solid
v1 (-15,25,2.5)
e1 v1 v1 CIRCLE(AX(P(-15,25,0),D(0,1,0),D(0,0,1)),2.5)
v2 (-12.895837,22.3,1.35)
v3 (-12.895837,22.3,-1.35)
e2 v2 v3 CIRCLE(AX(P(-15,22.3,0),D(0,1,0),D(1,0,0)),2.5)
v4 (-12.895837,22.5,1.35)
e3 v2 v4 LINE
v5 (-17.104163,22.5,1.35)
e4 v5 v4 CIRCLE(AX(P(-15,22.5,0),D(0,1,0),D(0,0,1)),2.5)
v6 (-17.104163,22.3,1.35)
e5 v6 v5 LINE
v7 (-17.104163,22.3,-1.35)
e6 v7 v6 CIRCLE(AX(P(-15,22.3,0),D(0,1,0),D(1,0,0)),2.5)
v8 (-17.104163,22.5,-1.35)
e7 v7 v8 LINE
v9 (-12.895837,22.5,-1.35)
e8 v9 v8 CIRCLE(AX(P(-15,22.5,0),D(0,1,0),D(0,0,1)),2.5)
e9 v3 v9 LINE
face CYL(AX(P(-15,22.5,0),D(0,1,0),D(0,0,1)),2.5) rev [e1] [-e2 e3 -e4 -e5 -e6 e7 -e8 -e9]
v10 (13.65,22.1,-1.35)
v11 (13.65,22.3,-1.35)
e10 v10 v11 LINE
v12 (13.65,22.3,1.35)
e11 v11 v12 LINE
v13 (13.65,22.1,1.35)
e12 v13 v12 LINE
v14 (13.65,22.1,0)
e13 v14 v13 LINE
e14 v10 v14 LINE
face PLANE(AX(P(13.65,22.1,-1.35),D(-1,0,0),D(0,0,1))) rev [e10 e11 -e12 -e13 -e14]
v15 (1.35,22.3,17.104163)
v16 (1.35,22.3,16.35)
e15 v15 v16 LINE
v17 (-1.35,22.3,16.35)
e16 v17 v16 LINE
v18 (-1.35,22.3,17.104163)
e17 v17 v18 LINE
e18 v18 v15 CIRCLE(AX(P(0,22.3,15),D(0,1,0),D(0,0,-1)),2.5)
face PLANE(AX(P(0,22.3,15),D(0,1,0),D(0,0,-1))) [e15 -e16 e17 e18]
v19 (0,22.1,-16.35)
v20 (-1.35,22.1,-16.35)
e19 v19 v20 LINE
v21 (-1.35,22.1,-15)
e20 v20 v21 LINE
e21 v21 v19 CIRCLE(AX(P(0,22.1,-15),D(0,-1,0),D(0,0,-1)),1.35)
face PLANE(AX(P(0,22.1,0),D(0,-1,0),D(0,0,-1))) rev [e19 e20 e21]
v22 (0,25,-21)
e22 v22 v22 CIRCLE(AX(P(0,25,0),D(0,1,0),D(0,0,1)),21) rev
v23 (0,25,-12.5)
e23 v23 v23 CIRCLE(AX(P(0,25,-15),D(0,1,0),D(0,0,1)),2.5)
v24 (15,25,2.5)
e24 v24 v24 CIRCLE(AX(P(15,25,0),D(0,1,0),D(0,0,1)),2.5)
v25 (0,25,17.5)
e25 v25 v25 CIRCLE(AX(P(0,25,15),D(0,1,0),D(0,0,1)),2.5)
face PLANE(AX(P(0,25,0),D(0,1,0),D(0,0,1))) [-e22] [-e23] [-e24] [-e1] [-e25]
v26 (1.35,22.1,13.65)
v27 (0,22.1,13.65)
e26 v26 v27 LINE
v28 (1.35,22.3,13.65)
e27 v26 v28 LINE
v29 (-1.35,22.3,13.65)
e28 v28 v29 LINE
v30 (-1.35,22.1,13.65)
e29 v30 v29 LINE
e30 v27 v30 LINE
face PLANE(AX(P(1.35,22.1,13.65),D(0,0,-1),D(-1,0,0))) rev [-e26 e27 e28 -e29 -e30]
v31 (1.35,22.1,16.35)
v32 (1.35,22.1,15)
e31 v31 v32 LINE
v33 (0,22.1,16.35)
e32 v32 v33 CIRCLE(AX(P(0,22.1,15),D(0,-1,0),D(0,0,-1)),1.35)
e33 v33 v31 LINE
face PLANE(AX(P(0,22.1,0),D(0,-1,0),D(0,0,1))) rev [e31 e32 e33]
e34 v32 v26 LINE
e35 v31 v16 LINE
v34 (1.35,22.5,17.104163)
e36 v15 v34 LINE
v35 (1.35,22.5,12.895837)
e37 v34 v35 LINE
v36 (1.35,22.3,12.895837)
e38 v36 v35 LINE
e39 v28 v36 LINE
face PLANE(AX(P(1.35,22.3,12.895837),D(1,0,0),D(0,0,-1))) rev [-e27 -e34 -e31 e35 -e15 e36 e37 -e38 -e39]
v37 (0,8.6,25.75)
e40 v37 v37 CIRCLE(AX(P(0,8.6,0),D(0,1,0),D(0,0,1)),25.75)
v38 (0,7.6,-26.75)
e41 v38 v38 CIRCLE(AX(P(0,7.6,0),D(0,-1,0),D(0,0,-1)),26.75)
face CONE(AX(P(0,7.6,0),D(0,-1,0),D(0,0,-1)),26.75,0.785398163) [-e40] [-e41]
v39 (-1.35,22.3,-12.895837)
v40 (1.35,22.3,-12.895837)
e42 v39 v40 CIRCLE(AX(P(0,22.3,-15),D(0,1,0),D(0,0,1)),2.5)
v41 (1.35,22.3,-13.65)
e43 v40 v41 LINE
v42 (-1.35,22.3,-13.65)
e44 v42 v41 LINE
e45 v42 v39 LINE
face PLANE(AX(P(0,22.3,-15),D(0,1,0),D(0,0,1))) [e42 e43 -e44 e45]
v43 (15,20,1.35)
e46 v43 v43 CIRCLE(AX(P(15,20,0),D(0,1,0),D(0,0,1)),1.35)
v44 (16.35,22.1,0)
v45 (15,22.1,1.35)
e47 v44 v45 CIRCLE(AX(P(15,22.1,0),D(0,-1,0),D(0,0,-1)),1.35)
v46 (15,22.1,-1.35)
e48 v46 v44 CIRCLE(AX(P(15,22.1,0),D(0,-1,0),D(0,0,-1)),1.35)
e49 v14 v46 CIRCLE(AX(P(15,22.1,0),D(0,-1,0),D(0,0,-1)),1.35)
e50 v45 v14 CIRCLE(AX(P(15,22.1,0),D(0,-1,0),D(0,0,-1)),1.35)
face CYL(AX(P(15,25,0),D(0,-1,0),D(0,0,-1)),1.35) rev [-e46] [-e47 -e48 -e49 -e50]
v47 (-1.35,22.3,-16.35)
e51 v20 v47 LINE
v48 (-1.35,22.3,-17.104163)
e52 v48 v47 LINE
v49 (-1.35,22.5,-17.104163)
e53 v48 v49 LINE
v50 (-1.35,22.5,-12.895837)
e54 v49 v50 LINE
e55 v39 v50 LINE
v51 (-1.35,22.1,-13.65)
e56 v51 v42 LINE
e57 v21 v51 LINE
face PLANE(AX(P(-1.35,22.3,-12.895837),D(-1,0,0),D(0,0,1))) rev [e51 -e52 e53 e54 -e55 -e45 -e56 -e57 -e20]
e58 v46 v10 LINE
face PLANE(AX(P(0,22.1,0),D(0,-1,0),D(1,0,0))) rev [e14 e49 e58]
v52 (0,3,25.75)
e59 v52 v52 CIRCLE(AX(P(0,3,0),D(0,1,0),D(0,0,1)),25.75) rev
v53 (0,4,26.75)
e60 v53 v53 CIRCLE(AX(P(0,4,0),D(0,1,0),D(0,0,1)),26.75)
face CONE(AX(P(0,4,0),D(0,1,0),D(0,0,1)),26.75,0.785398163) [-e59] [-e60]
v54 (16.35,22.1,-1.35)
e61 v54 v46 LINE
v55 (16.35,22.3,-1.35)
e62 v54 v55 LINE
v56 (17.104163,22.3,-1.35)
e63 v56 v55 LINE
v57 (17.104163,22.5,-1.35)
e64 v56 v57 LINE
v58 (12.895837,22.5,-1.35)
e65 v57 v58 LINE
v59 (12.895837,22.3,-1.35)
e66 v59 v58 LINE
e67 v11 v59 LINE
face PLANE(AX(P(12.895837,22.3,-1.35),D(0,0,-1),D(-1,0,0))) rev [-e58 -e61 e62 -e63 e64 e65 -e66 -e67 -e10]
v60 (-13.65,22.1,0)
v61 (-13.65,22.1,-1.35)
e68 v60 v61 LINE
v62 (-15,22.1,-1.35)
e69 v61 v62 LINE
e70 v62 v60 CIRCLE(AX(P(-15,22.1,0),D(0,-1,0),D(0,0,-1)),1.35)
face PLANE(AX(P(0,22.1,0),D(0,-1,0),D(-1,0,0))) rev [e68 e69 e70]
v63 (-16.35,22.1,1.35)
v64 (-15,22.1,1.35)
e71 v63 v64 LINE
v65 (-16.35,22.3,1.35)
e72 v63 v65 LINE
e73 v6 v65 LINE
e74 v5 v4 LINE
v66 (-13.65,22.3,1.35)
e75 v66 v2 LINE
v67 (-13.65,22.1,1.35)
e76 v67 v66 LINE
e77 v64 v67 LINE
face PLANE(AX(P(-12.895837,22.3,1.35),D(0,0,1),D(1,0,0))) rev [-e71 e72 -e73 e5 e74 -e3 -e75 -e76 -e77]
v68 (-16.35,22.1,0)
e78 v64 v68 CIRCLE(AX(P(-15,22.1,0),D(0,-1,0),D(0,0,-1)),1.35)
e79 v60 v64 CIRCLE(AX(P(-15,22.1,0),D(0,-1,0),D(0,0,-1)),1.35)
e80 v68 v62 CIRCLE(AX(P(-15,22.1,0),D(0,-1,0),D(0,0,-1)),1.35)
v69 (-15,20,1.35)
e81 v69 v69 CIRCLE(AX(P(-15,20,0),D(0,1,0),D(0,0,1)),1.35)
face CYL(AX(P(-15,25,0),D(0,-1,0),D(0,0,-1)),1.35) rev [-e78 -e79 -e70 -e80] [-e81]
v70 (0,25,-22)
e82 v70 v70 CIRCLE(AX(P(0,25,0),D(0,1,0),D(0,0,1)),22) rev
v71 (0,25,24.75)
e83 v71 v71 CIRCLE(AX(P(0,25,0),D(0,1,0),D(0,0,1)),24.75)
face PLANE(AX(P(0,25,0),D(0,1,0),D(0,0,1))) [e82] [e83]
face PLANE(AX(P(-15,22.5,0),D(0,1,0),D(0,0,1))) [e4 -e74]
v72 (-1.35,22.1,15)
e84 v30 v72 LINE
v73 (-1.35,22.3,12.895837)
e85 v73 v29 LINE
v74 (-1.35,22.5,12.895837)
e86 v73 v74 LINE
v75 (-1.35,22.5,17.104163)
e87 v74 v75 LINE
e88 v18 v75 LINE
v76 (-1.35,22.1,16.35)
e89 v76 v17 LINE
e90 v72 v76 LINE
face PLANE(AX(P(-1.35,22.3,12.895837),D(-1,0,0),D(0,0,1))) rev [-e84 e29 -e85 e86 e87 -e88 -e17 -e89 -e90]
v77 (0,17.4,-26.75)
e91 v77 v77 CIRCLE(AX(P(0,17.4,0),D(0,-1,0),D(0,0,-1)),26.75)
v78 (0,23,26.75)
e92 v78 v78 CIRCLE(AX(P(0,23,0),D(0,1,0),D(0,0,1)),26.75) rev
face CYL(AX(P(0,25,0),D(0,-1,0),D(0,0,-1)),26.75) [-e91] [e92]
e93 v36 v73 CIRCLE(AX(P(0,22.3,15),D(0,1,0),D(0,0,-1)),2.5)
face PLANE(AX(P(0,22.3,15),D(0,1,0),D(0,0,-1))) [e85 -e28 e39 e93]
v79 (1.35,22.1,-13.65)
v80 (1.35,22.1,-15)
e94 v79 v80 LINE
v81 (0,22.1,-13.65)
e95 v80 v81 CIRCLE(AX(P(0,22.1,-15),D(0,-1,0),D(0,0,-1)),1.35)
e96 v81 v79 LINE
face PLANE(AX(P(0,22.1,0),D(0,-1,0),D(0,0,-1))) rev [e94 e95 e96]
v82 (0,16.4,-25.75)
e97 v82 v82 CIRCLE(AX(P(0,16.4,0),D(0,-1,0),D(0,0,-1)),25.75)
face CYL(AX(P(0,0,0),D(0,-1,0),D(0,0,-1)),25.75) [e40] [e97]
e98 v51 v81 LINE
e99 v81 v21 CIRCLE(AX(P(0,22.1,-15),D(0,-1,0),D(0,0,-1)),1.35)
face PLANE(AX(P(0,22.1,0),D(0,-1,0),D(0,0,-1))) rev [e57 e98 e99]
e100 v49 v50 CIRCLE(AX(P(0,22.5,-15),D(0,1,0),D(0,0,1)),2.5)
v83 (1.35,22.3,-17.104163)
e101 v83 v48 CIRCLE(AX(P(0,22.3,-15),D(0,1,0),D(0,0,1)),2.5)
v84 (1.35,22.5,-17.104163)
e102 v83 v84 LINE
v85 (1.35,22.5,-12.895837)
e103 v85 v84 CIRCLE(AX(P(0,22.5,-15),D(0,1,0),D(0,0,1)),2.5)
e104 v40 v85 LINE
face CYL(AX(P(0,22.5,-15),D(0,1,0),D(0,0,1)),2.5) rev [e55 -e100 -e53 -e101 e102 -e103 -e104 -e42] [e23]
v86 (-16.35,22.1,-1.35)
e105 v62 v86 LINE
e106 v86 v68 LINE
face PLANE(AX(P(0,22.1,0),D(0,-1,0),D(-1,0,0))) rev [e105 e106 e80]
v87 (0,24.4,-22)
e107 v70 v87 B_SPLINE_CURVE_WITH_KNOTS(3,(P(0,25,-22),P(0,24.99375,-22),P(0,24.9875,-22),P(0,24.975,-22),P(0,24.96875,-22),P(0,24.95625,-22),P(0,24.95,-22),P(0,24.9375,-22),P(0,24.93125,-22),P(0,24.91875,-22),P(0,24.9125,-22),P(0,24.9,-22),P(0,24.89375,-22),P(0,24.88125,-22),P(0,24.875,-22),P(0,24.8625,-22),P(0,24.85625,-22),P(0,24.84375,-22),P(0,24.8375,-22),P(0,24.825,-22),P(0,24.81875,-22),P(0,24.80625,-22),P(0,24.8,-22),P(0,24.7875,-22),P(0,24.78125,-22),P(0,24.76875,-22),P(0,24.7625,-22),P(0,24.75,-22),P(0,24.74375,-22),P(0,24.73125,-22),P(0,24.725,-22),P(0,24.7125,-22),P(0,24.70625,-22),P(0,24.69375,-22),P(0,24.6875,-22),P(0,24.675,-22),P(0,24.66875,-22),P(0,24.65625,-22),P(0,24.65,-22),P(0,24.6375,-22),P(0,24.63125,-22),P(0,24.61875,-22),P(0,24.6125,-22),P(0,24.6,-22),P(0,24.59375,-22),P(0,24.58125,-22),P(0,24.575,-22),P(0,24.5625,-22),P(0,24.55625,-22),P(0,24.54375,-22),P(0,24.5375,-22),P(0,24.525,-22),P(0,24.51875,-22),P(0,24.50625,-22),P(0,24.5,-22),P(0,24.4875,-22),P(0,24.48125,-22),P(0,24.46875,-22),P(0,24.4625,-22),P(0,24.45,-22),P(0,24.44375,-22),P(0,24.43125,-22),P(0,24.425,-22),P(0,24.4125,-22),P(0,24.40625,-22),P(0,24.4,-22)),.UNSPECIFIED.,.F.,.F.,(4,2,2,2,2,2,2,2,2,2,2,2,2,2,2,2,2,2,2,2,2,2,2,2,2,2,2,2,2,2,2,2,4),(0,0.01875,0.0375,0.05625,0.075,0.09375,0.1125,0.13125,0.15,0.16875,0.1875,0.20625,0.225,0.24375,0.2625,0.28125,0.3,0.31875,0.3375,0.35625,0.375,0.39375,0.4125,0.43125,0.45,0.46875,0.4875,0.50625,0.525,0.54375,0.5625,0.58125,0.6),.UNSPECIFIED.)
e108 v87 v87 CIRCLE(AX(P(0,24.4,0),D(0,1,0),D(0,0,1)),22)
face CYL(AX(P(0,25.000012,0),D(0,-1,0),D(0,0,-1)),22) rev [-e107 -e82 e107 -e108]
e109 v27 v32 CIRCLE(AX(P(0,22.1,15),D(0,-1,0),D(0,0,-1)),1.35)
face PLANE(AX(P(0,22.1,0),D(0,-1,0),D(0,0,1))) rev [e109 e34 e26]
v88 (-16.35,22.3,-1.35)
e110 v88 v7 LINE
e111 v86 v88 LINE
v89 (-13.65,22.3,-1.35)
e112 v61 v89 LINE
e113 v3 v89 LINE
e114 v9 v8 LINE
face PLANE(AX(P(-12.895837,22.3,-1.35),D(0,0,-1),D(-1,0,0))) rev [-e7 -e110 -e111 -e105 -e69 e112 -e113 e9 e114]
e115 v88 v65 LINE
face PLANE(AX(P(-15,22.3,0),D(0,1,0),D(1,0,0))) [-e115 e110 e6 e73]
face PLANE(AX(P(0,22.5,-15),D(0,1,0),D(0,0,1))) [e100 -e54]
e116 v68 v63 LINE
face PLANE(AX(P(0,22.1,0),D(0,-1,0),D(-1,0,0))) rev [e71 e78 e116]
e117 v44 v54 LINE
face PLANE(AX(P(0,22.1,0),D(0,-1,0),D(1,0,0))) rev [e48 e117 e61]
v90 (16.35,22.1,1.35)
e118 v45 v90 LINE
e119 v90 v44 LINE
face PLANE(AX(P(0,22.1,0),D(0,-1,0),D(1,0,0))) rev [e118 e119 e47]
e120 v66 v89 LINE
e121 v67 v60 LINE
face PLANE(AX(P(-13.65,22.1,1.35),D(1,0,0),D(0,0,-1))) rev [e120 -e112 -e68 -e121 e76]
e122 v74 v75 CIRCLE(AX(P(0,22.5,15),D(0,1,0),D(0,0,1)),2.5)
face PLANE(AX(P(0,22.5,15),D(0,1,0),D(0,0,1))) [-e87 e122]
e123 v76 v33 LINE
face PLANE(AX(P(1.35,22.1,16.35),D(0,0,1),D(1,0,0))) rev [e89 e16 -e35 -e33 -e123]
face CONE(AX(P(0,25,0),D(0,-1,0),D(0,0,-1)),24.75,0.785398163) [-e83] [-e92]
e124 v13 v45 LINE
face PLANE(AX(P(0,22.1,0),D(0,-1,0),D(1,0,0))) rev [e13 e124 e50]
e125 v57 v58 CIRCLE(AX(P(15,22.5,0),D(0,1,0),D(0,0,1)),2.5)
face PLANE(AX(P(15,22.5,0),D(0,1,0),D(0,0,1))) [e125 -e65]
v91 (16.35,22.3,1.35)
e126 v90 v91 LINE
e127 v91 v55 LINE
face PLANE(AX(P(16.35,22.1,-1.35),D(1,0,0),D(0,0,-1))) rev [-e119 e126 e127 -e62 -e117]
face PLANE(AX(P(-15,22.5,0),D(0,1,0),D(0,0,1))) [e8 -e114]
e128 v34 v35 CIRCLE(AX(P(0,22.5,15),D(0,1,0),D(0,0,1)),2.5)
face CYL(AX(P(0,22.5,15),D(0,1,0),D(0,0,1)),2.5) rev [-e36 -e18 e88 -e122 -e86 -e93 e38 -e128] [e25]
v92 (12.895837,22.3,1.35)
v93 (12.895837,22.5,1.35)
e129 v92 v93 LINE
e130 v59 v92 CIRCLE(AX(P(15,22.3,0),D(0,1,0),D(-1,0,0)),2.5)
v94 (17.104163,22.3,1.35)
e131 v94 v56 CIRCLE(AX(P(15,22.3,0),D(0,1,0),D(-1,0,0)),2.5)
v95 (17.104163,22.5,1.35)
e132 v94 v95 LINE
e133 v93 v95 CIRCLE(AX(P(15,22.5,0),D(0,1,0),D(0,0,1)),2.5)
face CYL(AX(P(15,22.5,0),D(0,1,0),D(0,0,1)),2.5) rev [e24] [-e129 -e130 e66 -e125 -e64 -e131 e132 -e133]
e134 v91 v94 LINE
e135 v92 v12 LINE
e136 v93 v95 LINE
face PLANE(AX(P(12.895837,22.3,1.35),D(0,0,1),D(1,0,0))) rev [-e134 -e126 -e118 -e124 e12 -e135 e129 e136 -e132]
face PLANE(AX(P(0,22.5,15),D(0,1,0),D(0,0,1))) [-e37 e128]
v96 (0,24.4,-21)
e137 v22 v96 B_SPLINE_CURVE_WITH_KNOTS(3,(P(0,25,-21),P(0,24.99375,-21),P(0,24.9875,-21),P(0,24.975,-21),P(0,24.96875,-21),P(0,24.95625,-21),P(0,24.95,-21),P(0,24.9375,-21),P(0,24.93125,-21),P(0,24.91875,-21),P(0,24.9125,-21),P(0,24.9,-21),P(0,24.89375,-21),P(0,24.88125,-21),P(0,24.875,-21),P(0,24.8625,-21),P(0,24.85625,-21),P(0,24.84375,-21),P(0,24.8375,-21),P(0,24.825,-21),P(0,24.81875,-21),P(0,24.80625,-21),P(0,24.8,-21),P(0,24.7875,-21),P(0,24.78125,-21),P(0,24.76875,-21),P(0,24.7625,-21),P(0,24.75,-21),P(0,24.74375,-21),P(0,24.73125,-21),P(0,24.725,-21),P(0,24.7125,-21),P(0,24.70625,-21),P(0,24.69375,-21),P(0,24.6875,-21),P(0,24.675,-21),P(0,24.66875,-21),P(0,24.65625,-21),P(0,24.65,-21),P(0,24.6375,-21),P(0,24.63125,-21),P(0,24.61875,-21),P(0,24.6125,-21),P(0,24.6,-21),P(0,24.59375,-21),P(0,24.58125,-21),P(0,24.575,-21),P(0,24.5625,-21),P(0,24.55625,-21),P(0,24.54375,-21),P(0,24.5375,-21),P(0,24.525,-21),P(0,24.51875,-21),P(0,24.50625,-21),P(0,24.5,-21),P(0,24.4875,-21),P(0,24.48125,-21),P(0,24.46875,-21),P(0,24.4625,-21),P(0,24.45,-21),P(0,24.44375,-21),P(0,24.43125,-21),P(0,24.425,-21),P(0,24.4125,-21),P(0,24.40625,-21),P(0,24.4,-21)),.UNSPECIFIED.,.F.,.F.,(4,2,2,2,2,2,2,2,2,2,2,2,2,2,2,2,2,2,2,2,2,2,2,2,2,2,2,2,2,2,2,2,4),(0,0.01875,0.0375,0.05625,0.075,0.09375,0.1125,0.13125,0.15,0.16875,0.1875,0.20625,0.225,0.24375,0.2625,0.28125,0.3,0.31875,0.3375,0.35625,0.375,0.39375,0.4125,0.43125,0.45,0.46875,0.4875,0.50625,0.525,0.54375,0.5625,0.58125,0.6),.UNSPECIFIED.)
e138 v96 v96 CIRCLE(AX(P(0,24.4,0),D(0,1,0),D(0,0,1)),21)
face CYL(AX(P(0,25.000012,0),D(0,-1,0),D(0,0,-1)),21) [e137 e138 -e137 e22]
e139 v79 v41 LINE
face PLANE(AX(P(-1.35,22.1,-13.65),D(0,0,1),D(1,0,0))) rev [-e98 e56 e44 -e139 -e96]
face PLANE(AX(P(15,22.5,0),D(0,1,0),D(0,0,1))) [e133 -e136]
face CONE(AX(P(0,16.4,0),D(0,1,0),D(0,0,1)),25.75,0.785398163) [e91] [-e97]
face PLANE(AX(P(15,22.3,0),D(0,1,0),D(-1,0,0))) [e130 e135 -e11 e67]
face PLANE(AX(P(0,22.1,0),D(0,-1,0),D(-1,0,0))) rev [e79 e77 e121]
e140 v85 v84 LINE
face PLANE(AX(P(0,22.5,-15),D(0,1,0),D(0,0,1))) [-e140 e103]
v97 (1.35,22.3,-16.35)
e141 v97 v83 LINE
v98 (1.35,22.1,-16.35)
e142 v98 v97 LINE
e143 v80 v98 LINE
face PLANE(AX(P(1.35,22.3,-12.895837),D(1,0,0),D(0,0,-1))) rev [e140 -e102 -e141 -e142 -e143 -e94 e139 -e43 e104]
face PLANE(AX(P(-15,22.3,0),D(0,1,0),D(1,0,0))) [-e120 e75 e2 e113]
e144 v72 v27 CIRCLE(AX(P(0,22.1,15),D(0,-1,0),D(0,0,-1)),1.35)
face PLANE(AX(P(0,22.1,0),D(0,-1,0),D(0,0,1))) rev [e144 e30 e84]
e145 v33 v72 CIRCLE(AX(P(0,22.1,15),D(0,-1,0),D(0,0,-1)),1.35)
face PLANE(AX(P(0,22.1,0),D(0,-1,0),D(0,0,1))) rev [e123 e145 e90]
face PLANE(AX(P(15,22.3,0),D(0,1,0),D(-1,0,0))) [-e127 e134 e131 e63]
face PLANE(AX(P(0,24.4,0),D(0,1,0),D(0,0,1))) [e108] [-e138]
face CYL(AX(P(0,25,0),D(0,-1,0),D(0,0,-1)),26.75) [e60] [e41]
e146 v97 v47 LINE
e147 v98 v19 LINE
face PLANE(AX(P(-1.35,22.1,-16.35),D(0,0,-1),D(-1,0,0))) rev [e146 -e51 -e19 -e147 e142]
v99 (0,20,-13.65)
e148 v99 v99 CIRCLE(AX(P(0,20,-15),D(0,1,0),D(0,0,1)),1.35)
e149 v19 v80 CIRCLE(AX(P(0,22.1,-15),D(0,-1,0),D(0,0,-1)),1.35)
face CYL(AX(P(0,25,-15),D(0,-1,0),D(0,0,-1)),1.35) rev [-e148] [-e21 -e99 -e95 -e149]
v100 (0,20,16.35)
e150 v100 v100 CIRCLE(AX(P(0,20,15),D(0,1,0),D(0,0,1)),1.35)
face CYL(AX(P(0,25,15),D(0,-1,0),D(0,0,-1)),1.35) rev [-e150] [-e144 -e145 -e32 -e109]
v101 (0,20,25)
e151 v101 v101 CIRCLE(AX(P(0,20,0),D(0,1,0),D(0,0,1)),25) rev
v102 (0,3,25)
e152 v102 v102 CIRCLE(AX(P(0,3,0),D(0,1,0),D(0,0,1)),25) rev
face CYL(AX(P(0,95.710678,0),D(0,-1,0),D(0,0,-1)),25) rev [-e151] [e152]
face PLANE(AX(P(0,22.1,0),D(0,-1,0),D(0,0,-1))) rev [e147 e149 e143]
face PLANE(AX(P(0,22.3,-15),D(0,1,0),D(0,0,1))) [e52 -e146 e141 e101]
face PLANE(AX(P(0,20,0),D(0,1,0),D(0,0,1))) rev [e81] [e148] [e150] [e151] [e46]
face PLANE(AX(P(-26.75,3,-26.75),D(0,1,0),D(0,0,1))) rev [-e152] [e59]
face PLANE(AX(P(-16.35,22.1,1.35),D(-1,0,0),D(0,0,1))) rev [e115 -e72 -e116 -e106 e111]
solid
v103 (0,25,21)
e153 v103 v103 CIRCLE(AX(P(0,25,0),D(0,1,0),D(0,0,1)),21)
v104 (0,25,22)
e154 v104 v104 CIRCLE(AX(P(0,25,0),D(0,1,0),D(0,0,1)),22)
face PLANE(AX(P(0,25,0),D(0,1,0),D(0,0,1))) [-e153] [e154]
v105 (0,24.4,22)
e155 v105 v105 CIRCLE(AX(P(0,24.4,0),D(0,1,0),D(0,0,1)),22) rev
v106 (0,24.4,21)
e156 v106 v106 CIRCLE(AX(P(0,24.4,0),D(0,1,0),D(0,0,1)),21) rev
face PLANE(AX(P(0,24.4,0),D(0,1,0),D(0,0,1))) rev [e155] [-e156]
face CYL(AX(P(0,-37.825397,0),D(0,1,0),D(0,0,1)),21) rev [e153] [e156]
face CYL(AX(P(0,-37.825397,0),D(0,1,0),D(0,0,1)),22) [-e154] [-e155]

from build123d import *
from build123d.topology import SkipClean

# Parameters (mm, degrees)
SKETCH1_R               = 26.75
SKETCH1_R_2             = 1.35
BOSS_EXTRUDE1_DEPTH     = 25
SKETCH2_R               = 25
CUT_EXTRUDE1_DEPTH      = 20
SKETCH3_W               = 1
SKETCH3_H               = 9.8
CHAMFER1_SIZE           = 2
CHAMFER2_SIZE           = 1
CHAMFER3_SIZE           = 1
SKETCH4_R               = 2.5
CUT_EXTRUDE2_DEPTH      = 2.5
CUT_EXTRUDE3_DEPTH      = 0.2
SKETCH6_W               = 2.7
SKETCH6_H               = 2.7
CUT_EXTRUDE4_DEPTH      = 0.2
CIRPATTERN1_COUNT       = 4
CUT_EXTRUDE5_DEPTH      = 46.344514552
CUT_EXTRUDE5_DEPTH_BACK = 46.344514552
SKETCH7_W               = 53.5
SKETCH7_H               = 3
CHAMFER4_SIZE           = 1
CUT_EXTRUDE6_DEPTH      = 44.762141172
CUT_EXTRUDE6_DEPTH_BACK = 0.6
SKETCH8_R               = 22
SKETCH8_R_2             = 21
SKETCH8_2_R             = 22
SKETCH8_2_R_2           = 21
BOSS_EXTRUDE2_DEPTH     = 0.6


with BuildPart() as part:
    # Sketch1 → Boss-Extrude1 (new body)
    with BuildSketch(Plane(origin=(0, 0, 0), x_dir=(1, 0, 0), z_dir=(0, 1, 0))):
        with Locations(Location((0, 0, 0), (0, 0, 270))):
            Circle(SKETCH1_R)
        with Locations(Location((0, 15, 0), (0, 0, 270))):
            Circle(SKETCH1_R_2, mode=Mode.SUBTRACT)
        with Locations(Location((15, 0, 0), (0, 0, 270))):
            Circle(SKETCH1_R_2, mode=Mode.SUBTRACT)
        with Locations(Location((0, -15, 0), (0, 0, 270))):
            Circle(SKETCH1_R_2, mode=Mode.SUBTRACT)
        with Locations(Location((-15, 0, 0), (0, 0, 270))):
            Circle(SKETCH1_R_2, mode=Mode.SUBTRACT)
    extrude(amount=BOSS_EXTRUDE1_DEPTH)

    # Sketch2 → Cut-Extrude1 (cut)
    with BuildSketch(Plane.XZ):
        with Locations(Location((0, 0, 0), (0, 0, 270))):
            Circle(SKETCH2_R)
    extrude(amount=-CUT_EXTRUDE1_DEPTH, mode=Mode.SUBTRACT)

    # Sketch3 → Cut-Revolve1 (revolve, cut)
    with BuildSketch(Plane(origin=(0, 0, 0), x_dir=(0, 0, -1), z_dir=(1, 0, 0)), mode=Mode.PRIVATE) as cut_revolve1_sk:
        with Locations((-26.25, 12.5)):
            Rectangle(SKETCH3_W, SKETCH3_H)
    revolve(cut_revolve1_sk.sketch.rotate(Axis((0, 0, 0), (0, 1, 0)), 180), axis=Axis((0, 0, 0), (0, 1, 0)), mode=Mode.SUBTRACT)

    # Chamfer1
    chamfer1_edges = [part.edges().sort_by_distance(p)[0] for p in [
        (0, 25, -26.75),
    ]]
    chamfer(chamfer1_edges, length=CHAMFER1_SIZE)

    # Chamfer2
    chamfer2_edges = [part.edges().sort_by_distance(p)[0] for p in [
        (0, 7.6, 25.75),
        (0, 17.4, 25.75),
    ]]
    chamfer(chamfer2_edges, length=CHAMFER2_SIZE - 0.0001)  # a hair under: the kernel refuses the full size

    # Chamfer3
    chamfer3_edges = [part.edges().sort_by_distance(p)[0] for p in [
        (0, 0, -26.75),
    ]]
    chamfer(chamfer3_edges, length=CHAMFER3_SIZE)

    # Sketch4 → Cut-Extrude2 (cut)
    with BuildSketch(Plane(origin=(0, 25, 0), x_dir=(1, 0, 0), z_dir=(0, 1, 0))):
        with Locations(Location((0, 15, 0), (0, 0, 270))):
            Circle(SKETCH4_R)
        with Locations(Location((15, 0, 0), (0, 0, 270))):
            Circle(SKETCH4_R)
        with Locations(Location((0, -15, 0), (0, 0, 270))):
            Circle(SKETCH4_R)
        with Locations(Location((-15, 0, 0), (0, 0, 270))):
            Circle(SKETCH4_R)
    extrude(amount=-CUT_EXTRUDE2_DEPTH, mode=Mode.SUBTRACT)

    # Sketch5 → Cut-Extrude3 (cut)
    with SkipClean():  # the faces are left unmerged after this step: merging them gives an invalid solid
        with BuildSketch(Plane(origin=(0, 22.5, 0), x_dir=(1, 0, 0), z_dir=(0, 1, 0))):
            with BuildLine():
                Line((-1.35, 12.895837459), (-1.35, 17.104162541))
                ThreePointArc((-1.35, 17.104162541), (0, 17.5), (1.35, 17.104162541))
                Line((1.35, 17.104162541), (1.35, 12.895837459))
                ThreePointArc((1.35, 12.895837459), (0, 12.5), (-1.35, 12.895837459))
            make_face()
        cut_extrude3 = extrude(amount=-CUT_EXTRUDE3_DEPTH, mode=Mode.SUBTRACT)

    # Sketch6 → Cut-Extrude4 (cut)
    with SkipClean():  # the faces are left unmerged after this step: merging them gives an invalid solid
        with BuildSketch(Plane(origin=(0, 22.3, 0), x_dir=(1, 0, 0), z_dir=(0, 1, 0))):
            with Locations((0, 15)):
                Rectangle(SKETCH6_W, SKETCH6_H)
        cut_extrude4 = extrude(amount=-CUT_EXTRUDE4_DEPTH, mode=Mode.SUBTRACT)

    # CirPattern1: Cut-Extrude3, Cut-Extrude4 ×4 about axis
    with SkipClean():  # the faces are left unmerged after this step: merging them gives an invalid solid
        cirpattern1_axis = Axis((0, 0, 0), (0, 1, 0))
        add([cut_extrude3.rotate(cirpattern1_axis, i * 360 / CIRPATTERN1_COUNT) for i in range(1, CIRPATTERN1_COUNT)], mode=Mode.SUBTRACT)
        add([cut_extrude4.rotate(cirpattern1_axis, i * 360 / CIRPATTERN1_COUNT) for i in range(1, CIRPATTERN1_COUNT)], mode=Mode.SUBTRACT)

    # Sketch7 → Cut-Extrude5 (cut, two sides: drawn at the far end of the back side and taken through both)
    with SkipClean():  # the faces are left unmerged after this step: merging them gives an invalid solid
        with BuildSketch(Plane.XY.offset(-CUT_EXTRUDE5_DEPTH_BACK)):
            with Locations((0, 1.5)):
                Rectangle(SKETCH7_W, SKETCH7_H)
        extrude(amount=CUT_EXTRUDE5_DEPTH + CUT_EXTRUDE5_DEPTH_BACK, mode=Mode.SUBTRACT)

    # Chamfer4
    chamfer4_edges = [part.edges().sort_by_distance(p)[0] for p in [
        (18.915106397, 3, 18.915106397),
    ]]
    chamfer(chamfer4_edges, length=CHAMFER4_SIZE)

    # Sketch8 → Cut-Extrude6 (cut, two sides: drawn at the far end of the back side and taken through both)
    with SkipClean():  # the faces are left unmerged after this step: merging them gives an invalid solid
        with BuildSketch(Plane(origin=(0, 25, 0), x_dir=(1, 0, 0), z_dir=(0, 1, 0)).offset(-CUT_EXTRUDE6_DEPTH_BACK)):
            with Locations(Location((0, 0, 0), (0, 0, 90))):
                Circle(SKETCH8_R)
            with Locations(Location((0, 0, 0), (0, 0, 90))):
                Circle(SKETCH8_R_2, mode=Mode.SUBTRACT)
        extrude(amount=CUT_EXTRUDE6_DEPTH + CUT_EXTRUDE6_DEPTH_BACK, mode=Mode.SUBTRACT)


with BuildPart() as body_2:
    # Sketch8<2> → Boss-Extrude2 (new body)
    with BuildSketch(Plane(origin=(0, 25, 0), x_dir=(1, 0, 0), z_dir=(0, 1, 0))):
        with Locations(Location((0, 0, 0), (0, 0, 270))):
            Circle(SKETCH8_2_R)
        with Locations(Location((0, 0, 0), (0, 0, 270))):
            Circle(SKETCH8_2_R_2, mode=Mode.SUBTRACT)
    extrude(amount=-BOSS_EXTRUDE2_DEPTH)


solid = Compound([part.part, body_2.part])
